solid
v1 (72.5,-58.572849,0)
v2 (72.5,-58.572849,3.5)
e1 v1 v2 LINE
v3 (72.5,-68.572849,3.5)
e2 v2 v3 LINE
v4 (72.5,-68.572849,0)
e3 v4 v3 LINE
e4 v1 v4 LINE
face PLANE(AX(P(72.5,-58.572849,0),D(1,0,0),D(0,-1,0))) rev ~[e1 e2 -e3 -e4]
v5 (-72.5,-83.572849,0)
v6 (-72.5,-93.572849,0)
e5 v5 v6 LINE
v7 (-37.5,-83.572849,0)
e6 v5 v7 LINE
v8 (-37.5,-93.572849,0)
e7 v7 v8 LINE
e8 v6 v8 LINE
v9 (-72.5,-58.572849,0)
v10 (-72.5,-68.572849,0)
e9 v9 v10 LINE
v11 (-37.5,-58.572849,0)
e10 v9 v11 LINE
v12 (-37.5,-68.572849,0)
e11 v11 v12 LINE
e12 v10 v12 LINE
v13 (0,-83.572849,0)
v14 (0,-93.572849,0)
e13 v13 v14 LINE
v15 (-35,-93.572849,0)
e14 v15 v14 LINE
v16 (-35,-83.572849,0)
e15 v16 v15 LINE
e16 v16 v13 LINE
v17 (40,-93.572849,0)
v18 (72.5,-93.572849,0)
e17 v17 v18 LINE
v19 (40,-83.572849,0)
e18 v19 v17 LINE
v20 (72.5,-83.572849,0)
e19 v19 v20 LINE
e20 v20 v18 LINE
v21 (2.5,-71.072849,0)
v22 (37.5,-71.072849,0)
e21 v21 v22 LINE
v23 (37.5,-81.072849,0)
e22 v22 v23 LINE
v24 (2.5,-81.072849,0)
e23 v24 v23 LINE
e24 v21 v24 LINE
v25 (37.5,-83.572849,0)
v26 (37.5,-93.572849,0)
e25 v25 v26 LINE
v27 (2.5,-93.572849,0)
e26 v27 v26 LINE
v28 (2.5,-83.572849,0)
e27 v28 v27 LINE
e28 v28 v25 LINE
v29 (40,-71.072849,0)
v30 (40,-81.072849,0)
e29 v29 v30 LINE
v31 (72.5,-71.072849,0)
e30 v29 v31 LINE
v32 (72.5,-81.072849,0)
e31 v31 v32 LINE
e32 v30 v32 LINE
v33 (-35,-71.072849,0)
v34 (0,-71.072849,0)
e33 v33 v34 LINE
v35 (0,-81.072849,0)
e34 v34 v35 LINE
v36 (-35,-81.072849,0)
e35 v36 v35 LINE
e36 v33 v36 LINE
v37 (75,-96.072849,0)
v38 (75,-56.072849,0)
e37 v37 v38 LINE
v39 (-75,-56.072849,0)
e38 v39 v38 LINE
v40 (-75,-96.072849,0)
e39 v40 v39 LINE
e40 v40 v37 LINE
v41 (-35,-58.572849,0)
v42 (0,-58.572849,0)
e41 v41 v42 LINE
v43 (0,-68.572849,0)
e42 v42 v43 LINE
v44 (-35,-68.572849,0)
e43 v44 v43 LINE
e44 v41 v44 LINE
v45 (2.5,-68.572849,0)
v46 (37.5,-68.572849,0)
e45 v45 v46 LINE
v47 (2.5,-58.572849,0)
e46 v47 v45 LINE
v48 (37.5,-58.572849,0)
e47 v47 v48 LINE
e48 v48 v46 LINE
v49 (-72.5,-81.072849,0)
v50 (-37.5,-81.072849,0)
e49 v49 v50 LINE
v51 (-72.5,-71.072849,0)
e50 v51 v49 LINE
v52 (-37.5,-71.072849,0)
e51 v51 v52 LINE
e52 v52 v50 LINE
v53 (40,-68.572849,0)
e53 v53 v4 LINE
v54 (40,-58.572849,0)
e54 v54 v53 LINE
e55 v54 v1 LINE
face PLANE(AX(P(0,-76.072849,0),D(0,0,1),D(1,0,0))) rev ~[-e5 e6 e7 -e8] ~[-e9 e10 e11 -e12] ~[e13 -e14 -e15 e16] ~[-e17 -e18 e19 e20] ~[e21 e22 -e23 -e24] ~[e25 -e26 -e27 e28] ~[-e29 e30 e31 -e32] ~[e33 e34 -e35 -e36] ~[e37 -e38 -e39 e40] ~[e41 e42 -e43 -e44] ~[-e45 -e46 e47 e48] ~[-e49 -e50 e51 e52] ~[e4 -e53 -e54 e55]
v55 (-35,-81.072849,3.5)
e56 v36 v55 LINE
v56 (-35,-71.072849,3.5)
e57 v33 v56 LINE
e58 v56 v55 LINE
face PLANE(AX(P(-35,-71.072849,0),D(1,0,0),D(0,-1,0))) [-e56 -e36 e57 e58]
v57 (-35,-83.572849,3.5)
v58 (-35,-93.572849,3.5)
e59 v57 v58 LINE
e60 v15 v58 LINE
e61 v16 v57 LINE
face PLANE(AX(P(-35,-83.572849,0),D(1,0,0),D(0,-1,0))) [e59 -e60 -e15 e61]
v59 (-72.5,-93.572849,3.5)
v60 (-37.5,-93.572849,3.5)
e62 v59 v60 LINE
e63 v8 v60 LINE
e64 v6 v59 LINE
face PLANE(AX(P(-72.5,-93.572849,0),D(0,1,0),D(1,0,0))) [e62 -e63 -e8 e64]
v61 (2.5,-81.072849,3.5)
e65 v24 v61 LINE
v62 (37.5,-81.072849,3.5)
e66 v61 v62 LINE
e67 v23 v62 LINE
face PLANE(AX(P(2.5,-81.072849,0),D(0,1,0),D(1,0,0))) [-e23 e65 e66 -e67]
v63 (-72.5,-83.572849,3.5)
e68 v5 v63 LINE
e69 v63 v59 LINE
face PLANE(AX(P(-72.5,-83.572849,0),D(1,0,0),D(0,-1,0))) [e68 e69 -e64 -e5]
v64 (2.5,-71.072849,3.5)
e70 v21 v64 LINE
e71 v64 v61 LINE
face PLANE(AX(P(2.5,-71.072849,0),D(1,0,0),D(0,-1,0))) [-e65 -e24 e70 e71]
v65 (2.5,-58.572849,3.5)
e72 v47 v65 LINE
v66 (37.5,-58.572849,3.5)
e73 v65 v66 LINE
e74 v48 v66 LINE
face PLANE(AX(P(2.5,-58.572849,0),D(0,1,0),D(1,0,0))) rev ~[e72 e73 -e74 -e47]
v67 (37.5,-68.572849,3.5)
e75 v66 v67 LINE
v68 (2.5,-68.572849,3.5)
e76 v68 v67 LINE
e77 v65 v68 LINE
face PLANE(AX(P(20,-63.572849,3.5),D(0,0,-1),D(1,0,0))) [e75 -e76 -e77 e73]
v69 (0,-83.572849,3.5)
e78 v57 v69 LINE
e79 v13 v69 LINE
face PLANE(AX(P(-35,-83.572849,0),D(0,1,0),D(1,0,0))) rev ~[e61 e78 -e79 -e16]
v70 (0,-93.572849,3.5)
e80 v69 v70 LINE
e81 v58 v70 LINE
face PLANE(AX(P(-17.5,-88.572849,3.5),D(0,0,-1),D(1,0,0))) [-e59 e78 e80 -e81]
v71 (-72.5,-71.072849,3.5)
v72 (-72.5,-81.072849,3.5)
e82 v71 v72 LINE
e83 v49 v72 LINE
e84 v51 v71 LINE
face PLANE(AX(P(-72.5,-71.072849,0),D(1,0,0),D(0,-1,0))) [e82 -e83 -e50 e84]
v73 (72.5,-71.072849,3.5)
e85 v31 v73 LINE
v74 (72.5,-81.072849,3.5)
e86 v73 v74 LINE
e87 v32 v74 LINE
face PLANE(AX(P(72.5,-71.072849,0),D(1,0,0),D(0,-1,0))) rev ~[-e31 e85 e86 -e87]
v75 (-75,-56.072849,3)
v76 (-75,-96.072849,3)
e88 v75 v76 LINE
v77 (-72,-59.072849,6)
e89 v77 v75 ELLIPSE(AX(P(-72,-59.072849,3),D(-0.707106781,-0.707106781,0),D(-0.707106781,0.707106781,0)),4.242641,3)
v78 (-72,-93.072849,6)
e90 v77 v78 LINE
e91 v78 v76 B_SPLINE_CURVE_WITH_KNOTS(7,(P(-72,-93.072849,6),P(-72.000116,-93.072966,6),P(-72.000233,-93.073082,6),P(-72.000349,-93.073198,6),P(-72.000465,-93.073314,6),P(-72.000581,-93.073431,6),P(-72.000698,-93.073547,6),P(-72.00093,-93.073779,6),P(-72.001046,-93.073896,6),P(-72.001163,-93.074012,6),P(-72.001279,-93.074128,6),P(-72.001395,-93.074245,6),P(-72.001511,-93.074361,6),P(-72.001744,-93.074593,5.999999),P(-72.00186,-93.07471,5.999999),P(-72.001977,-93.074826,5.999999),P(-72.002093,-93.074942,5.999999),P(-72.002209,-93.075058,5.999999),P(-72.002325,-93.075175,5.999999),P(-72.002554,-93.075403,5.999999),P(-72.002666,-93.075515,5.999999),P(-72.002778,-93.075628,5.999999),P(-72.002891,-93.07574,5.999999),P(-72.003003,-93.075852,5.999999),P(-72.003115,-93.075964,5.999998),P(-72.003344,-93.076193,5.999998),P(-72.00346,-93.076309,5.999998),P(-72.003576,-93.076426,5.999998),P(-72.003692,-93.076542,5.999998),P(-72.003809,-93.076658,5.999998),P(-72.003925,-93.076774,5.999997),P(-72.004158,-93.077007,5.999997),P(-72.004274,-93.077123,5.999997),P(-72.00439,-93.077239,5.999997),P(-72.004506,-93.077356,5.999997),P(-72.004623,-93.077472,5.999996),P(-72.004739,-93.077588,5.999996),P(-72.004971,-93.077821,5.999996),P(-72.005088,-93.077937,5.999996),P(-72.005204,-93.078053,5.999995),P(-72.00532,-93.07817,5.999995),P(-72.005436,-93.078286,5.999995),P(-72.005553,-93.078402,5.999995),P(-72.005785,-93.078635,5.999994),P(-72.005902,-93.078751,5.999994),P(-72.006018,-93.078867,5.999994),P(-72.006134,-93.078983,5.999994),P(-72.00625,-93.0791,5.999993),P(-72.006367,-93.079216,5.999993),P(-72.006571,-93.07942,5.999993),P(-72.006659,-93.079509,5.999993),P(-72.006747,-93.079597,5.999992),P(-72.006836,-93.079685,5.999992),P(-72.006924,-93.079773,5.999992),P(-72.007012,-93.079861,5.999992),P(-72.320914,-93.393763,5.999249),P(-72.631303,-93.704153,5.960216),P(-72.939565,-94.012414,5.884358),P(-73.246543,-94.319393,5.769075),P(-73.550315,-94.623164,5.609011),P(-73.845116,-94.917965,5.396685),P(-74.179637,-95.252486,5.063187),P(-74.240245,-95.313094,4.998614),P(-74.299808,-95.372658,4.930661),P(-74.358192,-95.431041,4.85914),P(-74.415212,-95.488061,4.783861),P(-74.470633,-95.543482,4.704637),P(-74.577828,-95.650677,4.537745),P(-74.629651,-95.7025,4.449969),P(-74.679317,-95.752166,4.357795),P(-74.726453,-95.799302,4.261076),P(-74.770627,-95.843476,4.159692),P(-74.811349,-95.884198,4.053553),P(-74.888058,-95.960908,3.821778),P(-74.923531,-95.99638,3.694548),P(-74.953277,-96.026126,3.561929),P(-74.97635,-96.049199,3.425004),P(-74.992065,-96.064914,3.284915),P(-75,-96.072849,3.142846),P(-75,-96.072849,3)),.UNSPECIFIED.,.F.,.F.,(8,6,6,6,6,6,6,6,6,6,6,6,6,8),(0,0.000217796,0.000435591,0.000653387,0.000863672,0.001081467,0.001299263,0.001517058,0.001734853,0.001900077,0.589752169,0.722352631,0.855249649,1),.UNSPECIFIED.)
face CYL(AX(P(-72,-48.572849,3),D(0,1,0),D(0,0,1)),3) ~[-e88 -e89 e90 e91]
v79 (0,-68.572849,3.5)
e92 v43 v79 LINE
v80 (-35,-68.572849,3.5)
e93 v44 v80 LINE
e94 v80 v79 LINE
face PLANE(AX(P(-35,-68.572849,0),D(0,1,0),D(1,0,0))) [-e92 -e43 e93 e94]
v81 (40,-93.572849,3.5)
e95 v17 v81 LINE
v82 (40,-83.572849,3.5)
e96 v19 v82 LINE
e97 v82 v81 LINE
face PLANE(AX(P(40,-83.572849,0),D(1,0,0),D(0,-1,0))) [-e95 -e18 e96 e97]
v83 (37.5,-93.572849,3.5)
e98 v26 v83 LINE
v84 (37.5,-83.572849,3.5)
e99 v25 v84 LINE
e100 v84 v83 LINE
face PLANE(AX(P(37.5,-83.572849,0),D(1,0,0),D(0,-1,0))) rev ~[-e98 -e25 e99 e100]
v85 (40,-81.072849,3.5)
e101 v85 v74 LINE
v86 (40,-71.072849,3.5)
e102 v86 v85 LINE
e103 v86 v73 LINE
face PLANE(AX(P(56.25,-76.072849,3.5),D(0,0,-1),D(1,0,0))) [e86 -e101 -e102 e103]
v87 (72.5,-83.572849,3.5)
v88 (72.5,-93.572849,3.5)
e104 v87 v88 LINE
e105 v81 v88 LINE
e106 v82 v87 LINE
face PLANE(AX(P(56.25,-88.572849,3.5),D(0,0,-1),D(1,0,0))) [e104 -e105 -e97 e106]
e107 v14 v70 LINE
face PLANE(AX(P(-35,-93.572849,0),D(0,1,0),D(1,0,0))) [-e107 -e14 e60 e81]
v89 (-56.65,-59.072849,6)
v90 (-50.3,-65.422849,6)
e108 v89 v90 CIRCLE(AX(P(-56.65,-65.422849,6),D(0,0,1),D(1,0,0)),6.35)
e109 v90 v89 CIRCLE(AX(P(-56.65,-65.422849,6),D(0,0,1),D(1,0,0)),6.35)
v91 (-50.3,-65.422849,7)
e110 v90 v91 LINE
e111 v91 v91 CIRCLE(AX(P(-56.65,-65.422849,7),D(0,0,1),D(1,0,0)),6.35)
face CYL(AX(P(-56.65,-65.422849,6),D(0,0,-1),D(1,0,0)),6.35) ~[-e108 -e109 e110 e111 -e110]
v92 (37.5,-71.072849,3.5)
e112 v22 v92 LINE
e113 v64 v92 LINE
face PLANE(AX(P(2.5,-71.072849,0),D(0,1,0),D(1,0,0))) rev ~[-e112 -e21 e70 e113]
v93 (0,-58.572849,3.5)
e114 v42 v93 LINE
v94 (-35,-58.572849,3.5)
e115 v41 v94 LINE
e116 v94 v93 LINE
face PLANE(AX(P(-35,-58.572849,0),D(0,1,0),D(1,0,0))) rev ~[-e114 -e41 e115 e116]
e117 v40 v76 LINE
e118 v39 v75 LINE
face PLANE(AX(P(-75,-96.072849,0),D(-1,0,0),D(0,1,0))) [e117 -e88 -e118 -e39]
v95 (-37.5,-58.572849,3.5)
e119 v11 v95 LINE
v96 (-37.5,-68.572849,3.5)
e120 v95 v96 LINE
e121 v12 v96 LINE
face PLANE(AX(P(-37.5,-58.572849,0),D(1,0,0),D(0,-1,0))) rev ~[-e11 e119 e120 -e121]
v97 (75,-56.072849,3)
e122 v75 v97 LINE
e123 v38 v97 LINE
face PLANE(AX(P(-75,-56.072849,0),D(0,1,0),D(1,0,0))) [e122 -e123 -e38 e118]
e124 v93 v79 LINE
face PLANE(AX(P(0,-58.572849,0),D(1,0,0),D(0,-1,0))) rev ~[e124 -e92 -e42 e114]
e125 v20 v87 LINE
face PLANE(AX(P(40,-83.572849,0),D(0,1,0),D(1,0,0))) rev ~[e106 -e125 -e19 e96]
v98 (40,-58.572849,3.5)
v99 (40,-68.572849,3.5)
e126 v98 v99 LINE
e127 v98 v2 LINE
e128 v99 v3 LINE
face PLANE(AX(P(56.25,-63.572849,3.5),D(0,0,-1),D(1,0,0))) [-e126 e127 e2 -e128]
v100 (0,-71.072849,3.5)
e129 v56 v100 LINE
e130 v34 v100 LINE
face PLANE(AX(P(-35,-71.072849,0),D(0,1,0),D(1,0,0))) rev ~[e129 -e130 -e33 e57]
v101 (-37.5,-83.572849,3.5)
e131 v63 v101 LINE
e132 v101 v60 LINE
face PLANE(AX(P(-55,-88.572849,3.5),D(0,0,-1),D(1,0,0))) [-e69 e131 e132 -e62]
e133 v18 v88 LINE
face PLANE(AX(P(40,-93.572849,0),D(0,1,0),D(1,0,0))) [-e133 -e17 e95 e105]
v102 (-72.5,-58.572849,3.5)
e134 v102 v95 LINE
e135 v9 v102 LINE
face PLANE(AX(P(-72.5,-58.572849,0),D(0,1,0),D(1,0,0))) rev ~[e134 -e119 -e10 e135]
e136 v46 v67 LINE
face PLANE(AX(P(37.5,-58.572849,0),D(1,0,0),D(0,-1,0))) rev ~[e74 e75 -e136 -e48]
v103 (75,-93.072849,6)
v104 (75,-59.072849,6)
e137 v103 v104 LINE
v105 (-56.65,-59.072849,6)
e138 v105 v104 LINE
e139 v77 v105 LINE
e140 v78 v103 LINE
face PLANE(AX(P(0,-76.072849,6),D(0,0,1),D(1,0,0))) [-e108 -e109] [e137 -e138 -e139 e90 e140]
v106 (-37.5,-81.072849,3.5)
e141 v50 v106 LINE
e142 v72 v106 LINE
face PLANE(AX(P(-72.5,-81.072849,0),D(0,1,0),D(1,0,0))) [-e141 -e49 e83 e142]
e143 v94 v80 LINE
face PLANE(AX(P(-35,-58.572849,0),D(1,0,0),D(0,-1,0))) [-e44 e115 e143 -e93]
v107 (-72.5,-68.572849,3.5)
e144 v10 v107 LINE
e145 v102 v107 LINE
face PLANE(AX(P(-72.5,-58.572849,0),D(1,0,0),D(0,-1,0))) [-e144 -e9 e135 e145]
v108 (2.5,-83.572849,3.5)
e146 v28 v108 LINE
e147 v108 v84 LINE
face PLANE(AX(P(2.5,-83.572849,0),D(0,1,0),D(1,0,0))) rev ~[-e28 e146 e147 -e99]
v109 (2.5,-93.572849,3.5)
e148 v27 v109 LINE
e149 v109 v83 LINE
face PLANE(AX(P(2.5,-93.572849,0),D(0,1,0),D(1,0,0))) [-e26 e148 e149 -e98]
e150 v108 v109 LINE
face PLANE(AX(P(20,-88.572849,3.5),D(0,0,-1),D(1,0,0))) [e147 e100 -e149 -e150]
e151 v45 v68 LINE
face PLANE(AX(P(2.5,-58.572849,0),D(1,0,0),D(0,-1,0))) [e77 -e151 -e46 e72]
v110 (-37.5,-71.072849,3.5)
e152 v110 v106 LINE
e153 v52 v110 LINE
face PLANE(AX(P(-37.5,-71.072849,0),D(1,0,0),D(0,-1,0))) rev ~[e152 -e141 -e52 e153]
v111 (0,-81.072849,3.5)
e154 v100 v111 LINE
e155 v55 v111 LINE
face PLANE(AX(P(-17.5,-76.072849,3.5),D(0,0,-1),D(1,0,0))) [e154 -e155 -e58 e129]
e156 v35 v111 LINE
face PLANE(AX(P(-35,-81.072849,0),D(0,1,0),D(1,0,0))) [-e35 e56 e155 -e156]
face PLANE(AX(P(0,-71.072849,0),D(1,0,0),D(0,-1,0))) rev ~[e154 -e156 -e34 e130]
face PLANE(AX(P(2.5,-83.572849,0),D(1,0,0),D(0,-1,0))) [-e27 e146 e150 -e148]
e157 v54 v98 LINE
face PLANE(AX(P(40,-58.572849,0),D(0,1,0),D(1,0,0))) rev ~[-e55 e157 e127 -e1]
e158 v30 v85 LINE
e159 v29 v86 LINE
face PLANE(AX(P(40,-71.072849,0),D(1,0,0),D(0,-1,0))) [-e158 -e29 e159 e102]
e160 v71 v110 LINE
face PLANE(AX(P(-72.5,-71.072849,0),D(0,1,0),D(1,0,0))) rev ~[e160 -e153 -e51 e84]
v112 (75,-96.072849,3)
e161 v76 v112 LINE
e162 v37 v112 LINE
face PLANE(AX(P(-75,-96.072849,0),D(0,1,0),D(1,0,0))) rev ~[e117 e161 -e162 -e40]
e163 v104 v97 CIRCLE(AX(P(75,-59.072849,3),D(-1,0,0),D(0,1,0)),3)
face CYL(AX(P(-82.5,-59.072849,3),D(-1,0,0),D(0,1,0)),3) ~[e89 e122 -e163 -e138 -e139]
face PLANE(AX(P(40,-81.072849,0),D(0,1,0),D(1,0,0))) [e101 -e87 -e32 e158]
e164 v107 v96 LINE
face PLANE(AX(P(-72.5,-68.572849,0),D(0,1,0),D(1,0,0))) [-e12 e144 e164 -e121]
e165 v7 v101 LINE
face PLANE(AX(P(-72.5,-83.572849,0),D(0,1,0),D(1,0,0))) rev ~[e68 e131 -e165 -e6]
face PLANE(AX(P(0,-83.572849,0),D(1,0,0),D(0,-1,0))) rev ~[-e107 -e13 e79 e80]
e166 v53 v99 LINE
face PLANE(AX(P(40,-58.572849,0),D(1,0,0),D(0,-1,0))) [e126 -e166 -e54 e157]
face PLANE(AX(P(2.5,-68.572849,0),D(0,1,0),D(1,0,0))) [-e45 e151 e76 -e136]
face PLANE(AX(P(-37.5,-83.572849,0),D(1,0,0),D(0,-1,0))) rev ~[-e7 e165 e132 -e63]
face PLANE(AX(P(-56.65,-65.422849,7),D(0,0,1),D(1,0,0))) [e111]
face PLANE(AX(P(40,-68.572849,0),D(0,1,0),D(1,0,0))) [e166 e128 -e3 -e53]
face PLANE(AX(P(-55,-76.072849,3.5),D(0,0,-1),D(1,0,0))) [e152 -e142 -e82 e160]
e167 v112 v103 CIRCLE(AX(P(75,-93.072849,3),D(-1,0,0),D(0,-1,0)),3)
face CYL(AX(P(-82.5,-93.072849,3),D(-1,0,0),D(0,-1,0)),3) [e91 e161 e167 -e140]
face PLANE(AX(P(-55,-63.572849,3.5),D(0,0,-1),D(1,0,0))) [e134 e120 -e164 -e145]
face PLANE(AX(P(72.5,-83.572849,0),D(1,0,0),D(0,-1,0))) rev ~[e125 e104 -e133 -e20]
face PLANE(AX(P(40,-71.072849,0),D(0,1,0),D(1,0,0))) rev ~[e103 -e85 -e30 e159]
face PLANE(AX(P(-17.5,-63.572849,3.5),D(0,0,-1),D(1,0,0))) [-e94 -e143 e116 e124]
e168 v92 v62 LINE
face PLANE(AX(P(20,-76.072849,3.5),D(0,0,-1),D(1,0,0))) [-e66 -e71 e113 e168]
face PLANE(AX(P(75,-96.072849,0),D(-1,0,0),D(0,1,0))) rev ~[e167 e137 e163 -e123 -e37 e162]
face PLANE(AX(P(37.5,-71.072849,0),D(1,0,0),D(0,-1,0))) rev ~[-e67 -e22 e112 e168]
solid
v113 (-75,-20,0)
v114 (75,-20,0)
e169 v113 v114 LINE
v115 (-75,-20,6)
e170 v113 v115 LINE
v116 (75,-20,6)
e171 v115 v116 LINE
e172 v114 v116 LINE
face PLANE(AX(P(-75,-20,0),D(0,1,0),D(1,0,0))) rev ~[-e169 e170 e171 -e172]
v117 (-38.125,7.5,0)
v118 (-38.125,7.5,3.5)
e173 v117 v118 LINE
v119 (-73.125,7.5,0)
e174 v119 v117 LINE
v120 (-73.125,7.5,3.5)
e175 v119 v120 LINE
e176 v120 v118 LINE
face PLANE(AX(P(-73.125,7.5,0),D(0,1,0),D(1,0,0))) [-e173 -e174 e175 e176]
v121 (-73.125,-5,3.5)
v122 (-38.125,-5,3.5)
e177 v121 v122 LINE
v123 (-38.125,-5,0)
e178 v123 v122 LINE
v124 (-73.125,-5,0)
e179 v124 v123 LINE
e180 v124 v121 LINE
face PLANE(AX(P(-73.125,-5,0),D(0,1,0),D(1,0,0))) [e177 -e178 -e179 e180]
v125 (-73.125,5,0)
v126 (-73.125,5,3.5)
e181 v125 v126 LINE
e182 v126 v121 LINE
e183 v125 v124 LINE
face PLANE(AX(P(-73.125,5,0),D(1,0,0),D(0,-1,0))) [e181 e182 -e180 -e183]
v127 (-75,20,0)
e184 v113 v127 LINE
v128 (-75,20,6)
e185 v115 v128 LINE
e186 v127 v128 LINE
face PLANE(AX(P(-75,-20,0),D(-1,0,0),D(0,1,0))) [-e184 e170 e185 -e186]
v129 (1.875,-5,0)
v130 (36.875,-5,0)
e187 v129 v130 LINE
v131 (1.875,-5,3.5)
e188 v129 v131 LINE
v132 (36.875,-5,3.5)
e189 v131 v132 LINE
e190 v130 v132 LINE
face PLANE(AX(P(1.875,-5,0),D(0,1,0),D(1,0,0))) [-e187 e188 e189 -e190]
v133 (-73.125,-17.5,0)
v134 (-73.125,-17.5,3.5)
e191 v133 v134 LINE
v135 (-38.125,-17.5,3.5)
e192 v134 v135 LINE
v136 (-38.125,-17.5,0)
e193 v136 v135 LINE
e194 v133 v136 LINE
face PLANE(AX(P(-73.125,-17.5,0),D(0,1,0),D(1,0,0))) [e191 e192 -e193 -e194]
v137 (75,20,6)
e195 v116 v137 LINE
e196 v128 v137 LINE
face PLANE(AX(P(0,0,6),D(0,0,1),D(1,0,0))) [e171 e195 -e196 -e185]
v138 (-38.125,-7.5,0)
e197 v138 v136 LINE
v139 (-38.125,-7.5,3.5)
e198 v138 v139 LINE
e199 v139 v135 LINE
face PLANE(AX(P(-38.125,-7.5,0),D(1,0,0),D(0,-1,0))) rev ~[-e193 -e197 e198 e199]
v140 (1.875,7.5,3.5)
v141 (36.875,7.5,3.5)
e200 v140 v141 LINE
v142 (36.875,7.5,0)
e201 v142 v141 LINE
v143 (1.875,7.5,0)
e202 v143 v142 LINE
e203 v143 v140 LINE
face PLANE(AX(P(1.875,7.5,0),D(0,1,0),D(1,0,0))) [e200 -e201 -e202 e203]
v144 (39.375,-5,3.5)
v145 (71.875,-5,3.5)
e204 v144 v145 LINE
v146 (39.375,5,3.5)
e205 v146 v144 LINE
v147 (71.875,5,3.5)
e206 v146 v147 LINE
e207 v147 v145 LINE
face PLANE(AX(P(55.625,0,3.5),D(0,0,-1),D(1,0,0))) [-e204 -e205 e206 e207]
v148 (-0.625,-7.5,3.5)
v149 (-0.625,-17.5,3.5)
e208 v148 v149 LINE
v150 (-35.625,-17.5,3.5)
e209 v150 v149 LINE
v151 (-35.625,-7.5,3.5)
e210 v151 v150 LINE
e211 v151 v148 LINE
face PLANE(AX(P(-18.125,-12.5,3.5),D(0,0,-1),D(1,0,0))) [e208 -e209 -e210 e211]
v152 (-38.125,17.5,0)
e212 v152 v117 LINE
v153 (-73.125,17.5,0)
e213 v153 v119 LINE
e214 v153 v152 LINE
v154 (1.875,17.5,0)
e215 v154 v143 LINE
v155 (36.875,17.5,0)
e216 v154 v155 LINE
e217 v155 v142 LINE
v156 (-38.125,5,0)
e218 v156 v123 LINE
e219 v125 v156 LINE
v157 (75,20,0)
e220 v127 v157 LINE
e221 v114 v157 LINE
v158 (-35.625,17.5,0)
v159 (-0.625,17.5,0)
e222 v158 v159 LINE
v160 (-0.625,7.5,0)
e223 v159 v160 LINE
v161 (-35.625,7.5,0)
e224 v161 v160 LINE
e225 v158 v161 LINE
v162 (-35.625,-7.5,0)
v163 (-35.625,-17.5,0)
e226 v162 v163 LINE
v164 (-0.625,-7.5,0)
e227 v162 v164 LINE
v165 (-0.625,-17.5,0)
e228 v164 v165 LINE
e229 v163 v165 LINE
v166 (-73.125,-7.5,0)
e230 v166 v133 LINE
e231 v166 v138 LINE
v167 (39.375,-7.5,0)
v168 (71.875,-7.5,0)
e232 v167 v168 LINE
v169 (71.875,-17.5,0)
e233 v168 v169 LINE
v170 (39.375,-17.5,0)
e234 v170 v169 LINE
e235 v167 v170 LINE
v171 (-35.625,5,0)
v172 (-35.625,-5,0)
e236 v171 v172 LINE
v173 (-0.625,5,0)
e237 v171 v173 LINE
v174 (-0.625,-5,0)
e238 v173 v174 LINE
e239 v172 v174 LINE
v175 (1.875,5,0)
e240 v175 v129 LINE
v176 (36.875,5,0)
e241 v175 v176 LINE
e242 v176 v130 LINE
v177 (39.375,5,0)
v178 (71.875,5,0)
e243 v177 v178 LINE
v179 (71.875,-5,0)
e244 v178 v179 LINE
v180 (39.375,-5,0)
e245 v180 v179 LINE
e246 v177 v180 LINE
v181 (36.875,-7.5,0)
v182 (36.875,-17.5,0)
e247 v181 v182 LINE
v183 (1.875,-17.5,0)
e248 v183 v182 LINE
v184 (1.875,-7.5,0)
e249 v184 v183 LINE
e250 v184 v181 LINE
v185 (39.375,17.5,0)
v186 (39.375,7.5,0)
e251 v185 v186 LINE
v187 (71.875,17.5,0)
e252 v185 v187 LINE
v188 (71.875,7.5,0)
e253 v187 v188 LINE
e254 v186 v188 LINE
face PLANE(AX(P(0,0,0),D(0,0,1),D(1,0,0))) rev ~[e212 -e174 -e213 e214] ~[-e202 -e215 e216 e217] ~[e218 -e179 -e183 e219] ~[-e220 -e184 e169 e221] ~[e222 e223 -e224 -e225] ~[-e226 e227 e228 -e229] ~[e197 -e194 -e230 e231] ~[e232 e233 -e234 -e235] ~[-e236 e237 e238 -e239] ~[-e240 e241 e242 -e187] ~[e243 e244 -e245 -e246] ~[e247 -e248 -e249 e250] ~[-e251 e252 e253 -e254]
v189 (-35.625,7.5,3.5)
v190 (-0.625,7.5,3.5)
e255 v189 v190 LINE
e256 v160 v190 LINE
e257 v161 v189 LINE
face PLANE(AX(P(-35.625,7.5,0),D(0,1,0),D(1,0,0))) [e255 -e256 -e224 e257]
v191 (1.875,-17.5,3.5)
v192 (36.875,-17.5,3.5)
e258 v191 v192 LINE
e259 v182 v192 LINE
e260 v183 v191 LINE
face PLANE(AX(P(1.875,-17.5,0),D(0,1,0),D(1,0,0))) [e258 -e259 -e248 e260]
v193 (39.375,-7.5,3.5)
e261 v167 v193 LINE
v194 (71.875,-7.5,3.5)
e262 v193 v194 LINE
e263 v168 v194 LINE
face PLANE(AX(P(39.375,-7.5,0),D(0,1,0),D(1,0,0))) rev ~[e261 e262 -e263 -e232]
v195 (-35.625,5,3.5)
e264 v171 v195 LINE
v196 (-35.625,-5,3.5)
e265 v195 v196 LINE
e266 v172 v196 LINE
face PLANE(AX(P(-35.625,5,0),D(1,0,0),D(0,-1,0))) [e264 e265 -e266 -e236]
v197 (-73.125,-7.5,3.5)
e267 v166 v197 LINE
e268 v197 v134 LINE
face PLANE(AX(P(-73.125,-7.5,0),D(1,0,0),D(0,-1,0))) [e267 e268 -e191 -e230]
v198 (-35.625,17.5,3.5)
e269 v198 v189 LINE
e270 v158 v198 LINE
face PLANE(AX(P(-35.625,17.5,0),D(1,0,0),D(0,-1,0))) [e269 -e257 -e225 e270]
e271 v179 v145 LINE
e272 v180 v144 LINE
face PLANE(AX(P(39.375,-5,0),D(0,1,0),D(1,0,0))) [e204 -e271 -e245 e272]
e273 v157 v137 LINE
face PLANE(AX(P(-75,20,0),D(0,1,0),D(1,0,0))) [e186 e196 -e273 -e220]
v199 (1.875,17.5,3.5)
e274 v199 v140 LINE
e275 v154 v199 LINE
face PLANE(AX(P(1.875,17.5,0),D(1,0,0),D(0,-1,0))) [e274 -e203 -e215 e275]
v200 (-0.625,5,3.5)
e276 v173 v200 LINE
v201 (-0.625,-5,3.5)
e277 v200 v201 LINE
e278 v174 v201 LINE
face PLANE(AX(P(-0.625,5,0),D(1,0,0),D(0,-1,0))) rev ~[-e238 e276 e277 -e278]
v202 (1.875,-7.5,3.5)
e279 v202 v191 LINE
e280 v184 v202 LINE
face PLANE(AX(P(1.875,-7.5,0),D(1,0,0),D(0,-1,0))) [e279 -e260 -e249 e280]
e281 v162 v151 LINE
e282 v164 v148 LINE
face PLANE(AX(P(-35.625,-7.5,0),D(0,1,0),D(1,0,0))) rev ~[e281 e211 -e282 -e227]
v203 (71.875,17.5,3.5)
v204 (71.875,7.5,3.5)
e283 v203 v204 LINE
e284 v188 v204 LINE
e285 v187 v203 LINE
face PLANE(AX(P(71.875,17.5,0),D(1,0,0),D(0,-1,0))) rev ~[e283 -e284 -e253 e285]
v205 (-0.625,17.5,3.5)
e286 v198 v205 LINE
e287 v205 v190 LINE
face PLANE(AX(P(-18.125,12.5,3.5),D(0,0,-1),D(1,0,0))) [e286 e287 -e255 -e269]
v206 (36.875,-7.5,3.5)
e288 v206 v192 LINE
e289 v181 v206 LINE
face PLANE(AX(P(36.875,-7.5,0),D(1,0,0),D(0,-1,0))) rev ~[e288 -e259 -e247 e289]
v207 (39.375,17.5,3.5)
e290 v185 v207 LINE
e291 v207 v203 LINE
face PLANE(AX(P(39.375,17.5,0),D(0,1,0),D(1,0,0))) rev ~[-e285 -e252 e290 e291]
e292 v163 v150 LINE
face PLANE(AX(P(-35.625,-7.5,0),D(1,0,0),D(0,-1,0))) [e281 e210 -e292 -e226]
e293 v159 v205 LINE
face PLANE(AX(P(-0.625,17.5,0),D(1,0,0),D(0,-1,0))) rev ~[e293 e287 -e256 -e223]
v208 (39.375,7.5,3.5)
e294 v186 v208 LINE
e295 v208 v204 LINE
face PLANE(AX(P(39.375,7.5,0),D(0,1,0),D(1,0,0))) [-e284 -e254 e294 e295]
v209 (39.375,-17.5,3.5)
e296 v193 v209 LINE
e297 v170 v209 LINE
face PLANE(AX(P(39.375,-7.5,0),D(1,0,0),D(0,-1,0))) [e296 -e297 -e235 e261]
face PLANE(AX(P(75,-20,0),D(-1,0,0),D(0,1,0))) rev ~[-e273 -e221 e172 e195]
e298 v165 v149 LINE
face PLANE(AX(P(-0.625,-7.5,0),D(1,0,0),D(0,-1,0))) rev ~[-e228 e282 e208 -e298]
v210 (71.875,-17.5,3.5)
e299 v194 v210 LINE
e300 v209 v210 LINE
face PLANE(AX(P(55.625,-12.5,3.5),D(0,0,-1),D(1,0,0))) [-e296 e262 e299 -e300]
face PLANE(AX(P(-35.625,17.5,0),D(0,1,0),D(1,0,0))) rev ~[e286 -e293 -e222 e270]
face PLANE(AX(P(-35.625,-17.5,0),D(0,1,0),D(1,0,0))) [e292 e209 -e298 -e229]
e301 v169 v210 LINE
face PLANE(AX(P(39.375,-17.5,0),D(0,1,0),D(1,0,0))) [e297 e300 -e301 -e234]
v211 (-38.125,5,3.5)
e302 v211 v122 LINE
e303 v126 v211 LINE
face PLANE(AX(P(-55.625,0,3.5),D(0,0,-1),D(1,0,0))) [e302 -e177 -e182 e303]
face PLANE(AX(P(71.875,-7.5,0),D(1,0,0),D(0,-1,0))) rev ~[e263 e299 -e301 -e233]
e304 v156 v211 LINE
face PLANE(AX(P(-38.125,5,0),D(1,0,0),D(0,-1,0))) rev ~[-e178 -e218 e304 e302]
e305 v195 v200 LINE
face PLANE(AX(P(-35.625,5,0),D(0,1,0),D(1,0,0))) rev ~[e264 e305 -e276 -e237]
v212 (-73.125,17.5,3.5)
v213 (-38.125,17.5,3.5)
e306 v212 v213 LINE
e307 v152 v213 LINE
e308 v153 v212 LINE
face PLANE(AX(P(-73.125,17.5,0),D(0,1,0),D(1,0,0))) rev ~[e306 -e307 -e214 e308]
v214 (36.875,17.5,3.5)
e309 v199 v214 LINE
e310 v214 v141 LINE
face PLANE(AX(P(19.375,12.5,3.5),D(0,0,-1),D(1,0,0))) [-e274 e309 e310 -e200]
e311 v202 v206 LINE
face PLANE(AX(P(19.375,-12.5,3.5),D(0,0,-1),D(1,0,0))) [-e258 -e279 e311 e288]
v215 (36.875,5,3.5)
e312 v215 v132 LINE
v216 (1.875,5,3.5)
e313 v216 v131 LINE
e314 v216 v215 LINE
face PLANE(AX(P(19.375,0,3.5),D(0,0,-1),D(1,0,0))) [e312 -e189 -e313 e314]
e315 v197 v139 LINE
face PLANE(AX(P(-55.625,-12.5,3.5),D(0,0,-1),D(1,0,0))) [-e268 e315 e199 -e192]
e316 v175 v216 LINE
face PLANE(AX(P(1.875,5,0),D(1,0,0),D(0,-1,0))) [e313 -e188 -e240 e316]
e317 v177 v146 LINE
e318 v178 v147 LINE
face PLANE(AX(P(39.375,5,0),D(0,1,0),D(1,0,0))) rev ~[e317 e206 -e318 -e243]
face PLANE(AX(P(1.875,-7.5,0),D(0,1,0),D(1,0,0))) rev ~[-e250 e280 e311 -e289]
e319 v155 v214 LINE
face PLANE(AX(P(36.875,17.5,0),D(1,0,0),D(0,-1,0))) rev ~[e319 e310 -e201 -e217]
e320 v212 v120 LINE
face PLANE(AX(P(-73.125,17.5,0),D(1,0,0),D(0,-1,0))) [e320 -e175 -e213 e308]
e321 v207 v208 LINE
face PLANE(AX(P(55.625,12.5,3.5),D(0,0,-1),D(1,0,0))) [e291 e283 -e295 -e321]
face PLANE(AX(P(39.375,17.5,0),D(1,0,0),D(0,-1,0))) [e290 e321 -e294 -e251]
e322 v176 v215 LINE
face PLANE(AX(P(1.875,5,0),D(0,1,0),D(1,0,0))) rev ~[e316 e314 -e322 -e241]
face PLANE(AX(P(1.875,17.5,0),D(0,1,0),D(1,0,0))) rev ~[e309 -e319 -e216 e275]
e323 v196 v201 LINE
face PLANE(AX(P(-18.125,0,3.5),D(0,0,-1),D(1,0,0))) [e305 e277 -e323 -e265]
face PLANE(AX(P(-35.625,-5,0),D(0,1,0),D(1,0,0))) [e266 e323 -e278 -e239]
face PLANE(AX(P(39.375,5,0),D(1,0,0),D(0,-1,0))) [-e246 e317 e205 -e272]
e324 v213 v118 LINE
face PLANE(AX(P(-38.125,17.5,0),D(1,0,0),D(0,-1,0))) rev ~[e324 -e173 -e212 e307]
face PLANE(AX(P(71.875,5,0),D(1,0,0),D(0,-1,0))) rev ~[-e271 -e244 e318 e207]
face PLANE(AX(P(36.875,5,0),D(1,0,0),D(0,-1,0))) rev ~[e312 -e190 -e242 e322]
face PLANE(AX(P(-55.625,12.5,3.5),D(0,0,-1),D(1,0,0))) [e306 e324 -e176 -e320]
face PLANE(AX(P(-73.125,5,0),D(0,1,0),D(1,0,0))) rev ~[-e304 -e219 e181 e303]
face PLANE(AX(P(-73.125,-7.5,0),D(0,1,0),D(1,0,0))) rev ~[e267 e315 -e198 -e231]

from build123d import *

# Parameters (mm, degrees)
F0_W        = 150
F0_H        = 40
F1_DEPTH    = 6
F2_W        = 150
F2_H        = 40
F3_DEPTH    = 6
F4_R        = 6.35
F5_DEPTH    = 1
F6_W        = 35
F6_H        = 10
F6_W_2      = 32.5
F7_DEPTH    = 3.5
F8_T1_DEPTH = 165
F8_T3_DEPTH = 55
F9_W        = 32.5
F9_H        = 10
F9_W_2      = 35
F10_DEPTH   = 3.5


# Not quite as in the source:
# - a fillet or chamfer that OpenCascade refuses, or shapes differently, is made with other operations: its cross-section is extruded or revolved along the edge and cut away or added


with BuildPart() as f1:
    # F0 (on Top) → F1 (new body)
    with BuildSketch(Plane.XY):
        Rectangle(F0_W, F0_H)
    extrude(amount=F1_DEPTH)

    # F9 (on face) → F10 (cut)
    with BuildSketch(Plane(origin=(0, 0, 0), x_dir=(1, 0, 0), z_dir=(0, 0, -1))):
        with Locations((55.625, -12.5)):
            Rectangle(F9_W, F9_H)
        with Locations((19.375, -12.5)):
            Rectangle(F9_W_2, F9_H)
        with Locations((55.625, 0)):
            Rectangle(F9_W, F9_H)
        with Locations((19.375, 0)):
            Rectangle(F9_W_2, F9_H)
        with Locations((55.625, 12.5)):
            Rectangle(F9_W, F9_H)
        with Locations((-18.125, -12.5)):
            Rectangle(F9_W_2, F9_H)
        with Locations((-55.625, -12.5)):
            Rectangle(F9_W_2, F9_H)
        with Locations((-55.625, 0)):
            Rectangle(F9_W_2, F9_H)
        with Locations((-55.625, 12.5)):
            Rectangle(F9_W_2, F9_H)
        with Locations((-18.125, 12.5)):
            Rectangle(F9_W_2, F9_H)
        with Locations((-18.125, 0)):
            Rectangle(F9_W_2, F9_H)
        with Locations((19.375, 12.5)):
            Rectangle(F9_W_2, F9_H)
    extrude(amount=-F10_DEPTH, mode=Mode.SUBTRACT)


with BuildPart() as f3:
    # F2 (on Top) → F3 (new body)
    with BuildSketch(Plane.XY):
        with Locations((0, -76.0728493333)):
            Rectangle(F2_W, F2_H)
    extrude(amount=F3_DEPTH)

    # F4 (on face) → F5 (join)
    with BuildSketch(Plane.XY.offset(6)):
        with Locations((-56.65, -65.4228493333)):
            Circle(F4_R)
    extrude(amount=F5_DEPTH)

    # F6 (on face) → F7 (cut)
    with BuildSketch(Plane(origin=(0, 0, 0), x_dir=(1, 0, 0), z_dir=(0, 0, -1))):
        with Locations((-55, 88.5728493333)):
            Rectangle(F6_W, F6_H)
        with Locations((-17.5, 88.5728493333)):
            Rectangle(F6_W, F6_H)
        with Locations((-17.5, 76.0728493333)):
            Rectangle(F6_W, F6_H)
        with Locations((-55, 76.0728493333)):
            Rectangle(F6_W, F6_H)
        with Locations((-55, 63.5728493333)):
            Rectangle(F6_W, F6_H)
        with Locations((20, 63.5728493333)):
            Rectangle(F6_W, F6_H)
        with Locations((20, 76.0728493333)):
            Rectangle(F6_W, F6_H)
        with Locations((20, 88.5728493333)):
            Rectangle(F6_W, F6_H)
        with Locations((-17.5, 63.5728493333)):
            Rectangle(F6_W, F6_H)
        with Locations((56.25, 88.5728493333)):
            Rectangle(F6_W_2, F6_H)
        with Locations((56.25, 76.0728493333)):
            Rectangle(F6_W_2, F6_H)
        with Locations((56.25, 63.5728493333)):
            Rectangle(F6_W_2, F6_H)
    extrude(amount=-F7_DEPTH, mode=Mode.SUBTRACT)

    # F8: fillet of radius 3 on 3 edges, made by hand

    # F8_s2 → F8_t1 (cut)
    with BuildSketch(Plane.YZ.offset(-82.5)):
        with BuildLine():
            ThreePointArc((-56.0728493333, 3), (-56.9515289897, 5.1213203436), (-59.0728493333, 6))
            Line((-59.0728493333, 6), (-56.0728493333, 6))
            Line((-56.0728493333, 6), (-56.0728493333, 3))
        make_face()
        with BuildLine():
            ThreePointArc((-96.0728493333, 3), (-95.1941696768, 5.1213203436), (-93.0728493333, 6))
            Line((-93.0728493333, 6), (-96.0728493333, 6))
            Line((-96.0728493333, 6), (-96.0728493333, 3))
        make_face()
    extrude(amount=F8_T1_DEPTH, mode=Mode.SUBTRACT)

    # F8_s4 → F8_t3 (cut)
    with BuildSketch(Plane.XZ.offset(48.5728493333)):
        with BuildLine():
            ThreePointArc((-72, 6), (-74.1213203436, 5.1213203436), (-75, 3))
            Line((-75, 3), (-75, 6))
            Line((-75, 6), (-72, 6))
        make_face()
    extrude(amount=F8_T3_DEPTH, mode=Mode.SUBTRACT)


solid = Compound([f1.part, f3.part])
